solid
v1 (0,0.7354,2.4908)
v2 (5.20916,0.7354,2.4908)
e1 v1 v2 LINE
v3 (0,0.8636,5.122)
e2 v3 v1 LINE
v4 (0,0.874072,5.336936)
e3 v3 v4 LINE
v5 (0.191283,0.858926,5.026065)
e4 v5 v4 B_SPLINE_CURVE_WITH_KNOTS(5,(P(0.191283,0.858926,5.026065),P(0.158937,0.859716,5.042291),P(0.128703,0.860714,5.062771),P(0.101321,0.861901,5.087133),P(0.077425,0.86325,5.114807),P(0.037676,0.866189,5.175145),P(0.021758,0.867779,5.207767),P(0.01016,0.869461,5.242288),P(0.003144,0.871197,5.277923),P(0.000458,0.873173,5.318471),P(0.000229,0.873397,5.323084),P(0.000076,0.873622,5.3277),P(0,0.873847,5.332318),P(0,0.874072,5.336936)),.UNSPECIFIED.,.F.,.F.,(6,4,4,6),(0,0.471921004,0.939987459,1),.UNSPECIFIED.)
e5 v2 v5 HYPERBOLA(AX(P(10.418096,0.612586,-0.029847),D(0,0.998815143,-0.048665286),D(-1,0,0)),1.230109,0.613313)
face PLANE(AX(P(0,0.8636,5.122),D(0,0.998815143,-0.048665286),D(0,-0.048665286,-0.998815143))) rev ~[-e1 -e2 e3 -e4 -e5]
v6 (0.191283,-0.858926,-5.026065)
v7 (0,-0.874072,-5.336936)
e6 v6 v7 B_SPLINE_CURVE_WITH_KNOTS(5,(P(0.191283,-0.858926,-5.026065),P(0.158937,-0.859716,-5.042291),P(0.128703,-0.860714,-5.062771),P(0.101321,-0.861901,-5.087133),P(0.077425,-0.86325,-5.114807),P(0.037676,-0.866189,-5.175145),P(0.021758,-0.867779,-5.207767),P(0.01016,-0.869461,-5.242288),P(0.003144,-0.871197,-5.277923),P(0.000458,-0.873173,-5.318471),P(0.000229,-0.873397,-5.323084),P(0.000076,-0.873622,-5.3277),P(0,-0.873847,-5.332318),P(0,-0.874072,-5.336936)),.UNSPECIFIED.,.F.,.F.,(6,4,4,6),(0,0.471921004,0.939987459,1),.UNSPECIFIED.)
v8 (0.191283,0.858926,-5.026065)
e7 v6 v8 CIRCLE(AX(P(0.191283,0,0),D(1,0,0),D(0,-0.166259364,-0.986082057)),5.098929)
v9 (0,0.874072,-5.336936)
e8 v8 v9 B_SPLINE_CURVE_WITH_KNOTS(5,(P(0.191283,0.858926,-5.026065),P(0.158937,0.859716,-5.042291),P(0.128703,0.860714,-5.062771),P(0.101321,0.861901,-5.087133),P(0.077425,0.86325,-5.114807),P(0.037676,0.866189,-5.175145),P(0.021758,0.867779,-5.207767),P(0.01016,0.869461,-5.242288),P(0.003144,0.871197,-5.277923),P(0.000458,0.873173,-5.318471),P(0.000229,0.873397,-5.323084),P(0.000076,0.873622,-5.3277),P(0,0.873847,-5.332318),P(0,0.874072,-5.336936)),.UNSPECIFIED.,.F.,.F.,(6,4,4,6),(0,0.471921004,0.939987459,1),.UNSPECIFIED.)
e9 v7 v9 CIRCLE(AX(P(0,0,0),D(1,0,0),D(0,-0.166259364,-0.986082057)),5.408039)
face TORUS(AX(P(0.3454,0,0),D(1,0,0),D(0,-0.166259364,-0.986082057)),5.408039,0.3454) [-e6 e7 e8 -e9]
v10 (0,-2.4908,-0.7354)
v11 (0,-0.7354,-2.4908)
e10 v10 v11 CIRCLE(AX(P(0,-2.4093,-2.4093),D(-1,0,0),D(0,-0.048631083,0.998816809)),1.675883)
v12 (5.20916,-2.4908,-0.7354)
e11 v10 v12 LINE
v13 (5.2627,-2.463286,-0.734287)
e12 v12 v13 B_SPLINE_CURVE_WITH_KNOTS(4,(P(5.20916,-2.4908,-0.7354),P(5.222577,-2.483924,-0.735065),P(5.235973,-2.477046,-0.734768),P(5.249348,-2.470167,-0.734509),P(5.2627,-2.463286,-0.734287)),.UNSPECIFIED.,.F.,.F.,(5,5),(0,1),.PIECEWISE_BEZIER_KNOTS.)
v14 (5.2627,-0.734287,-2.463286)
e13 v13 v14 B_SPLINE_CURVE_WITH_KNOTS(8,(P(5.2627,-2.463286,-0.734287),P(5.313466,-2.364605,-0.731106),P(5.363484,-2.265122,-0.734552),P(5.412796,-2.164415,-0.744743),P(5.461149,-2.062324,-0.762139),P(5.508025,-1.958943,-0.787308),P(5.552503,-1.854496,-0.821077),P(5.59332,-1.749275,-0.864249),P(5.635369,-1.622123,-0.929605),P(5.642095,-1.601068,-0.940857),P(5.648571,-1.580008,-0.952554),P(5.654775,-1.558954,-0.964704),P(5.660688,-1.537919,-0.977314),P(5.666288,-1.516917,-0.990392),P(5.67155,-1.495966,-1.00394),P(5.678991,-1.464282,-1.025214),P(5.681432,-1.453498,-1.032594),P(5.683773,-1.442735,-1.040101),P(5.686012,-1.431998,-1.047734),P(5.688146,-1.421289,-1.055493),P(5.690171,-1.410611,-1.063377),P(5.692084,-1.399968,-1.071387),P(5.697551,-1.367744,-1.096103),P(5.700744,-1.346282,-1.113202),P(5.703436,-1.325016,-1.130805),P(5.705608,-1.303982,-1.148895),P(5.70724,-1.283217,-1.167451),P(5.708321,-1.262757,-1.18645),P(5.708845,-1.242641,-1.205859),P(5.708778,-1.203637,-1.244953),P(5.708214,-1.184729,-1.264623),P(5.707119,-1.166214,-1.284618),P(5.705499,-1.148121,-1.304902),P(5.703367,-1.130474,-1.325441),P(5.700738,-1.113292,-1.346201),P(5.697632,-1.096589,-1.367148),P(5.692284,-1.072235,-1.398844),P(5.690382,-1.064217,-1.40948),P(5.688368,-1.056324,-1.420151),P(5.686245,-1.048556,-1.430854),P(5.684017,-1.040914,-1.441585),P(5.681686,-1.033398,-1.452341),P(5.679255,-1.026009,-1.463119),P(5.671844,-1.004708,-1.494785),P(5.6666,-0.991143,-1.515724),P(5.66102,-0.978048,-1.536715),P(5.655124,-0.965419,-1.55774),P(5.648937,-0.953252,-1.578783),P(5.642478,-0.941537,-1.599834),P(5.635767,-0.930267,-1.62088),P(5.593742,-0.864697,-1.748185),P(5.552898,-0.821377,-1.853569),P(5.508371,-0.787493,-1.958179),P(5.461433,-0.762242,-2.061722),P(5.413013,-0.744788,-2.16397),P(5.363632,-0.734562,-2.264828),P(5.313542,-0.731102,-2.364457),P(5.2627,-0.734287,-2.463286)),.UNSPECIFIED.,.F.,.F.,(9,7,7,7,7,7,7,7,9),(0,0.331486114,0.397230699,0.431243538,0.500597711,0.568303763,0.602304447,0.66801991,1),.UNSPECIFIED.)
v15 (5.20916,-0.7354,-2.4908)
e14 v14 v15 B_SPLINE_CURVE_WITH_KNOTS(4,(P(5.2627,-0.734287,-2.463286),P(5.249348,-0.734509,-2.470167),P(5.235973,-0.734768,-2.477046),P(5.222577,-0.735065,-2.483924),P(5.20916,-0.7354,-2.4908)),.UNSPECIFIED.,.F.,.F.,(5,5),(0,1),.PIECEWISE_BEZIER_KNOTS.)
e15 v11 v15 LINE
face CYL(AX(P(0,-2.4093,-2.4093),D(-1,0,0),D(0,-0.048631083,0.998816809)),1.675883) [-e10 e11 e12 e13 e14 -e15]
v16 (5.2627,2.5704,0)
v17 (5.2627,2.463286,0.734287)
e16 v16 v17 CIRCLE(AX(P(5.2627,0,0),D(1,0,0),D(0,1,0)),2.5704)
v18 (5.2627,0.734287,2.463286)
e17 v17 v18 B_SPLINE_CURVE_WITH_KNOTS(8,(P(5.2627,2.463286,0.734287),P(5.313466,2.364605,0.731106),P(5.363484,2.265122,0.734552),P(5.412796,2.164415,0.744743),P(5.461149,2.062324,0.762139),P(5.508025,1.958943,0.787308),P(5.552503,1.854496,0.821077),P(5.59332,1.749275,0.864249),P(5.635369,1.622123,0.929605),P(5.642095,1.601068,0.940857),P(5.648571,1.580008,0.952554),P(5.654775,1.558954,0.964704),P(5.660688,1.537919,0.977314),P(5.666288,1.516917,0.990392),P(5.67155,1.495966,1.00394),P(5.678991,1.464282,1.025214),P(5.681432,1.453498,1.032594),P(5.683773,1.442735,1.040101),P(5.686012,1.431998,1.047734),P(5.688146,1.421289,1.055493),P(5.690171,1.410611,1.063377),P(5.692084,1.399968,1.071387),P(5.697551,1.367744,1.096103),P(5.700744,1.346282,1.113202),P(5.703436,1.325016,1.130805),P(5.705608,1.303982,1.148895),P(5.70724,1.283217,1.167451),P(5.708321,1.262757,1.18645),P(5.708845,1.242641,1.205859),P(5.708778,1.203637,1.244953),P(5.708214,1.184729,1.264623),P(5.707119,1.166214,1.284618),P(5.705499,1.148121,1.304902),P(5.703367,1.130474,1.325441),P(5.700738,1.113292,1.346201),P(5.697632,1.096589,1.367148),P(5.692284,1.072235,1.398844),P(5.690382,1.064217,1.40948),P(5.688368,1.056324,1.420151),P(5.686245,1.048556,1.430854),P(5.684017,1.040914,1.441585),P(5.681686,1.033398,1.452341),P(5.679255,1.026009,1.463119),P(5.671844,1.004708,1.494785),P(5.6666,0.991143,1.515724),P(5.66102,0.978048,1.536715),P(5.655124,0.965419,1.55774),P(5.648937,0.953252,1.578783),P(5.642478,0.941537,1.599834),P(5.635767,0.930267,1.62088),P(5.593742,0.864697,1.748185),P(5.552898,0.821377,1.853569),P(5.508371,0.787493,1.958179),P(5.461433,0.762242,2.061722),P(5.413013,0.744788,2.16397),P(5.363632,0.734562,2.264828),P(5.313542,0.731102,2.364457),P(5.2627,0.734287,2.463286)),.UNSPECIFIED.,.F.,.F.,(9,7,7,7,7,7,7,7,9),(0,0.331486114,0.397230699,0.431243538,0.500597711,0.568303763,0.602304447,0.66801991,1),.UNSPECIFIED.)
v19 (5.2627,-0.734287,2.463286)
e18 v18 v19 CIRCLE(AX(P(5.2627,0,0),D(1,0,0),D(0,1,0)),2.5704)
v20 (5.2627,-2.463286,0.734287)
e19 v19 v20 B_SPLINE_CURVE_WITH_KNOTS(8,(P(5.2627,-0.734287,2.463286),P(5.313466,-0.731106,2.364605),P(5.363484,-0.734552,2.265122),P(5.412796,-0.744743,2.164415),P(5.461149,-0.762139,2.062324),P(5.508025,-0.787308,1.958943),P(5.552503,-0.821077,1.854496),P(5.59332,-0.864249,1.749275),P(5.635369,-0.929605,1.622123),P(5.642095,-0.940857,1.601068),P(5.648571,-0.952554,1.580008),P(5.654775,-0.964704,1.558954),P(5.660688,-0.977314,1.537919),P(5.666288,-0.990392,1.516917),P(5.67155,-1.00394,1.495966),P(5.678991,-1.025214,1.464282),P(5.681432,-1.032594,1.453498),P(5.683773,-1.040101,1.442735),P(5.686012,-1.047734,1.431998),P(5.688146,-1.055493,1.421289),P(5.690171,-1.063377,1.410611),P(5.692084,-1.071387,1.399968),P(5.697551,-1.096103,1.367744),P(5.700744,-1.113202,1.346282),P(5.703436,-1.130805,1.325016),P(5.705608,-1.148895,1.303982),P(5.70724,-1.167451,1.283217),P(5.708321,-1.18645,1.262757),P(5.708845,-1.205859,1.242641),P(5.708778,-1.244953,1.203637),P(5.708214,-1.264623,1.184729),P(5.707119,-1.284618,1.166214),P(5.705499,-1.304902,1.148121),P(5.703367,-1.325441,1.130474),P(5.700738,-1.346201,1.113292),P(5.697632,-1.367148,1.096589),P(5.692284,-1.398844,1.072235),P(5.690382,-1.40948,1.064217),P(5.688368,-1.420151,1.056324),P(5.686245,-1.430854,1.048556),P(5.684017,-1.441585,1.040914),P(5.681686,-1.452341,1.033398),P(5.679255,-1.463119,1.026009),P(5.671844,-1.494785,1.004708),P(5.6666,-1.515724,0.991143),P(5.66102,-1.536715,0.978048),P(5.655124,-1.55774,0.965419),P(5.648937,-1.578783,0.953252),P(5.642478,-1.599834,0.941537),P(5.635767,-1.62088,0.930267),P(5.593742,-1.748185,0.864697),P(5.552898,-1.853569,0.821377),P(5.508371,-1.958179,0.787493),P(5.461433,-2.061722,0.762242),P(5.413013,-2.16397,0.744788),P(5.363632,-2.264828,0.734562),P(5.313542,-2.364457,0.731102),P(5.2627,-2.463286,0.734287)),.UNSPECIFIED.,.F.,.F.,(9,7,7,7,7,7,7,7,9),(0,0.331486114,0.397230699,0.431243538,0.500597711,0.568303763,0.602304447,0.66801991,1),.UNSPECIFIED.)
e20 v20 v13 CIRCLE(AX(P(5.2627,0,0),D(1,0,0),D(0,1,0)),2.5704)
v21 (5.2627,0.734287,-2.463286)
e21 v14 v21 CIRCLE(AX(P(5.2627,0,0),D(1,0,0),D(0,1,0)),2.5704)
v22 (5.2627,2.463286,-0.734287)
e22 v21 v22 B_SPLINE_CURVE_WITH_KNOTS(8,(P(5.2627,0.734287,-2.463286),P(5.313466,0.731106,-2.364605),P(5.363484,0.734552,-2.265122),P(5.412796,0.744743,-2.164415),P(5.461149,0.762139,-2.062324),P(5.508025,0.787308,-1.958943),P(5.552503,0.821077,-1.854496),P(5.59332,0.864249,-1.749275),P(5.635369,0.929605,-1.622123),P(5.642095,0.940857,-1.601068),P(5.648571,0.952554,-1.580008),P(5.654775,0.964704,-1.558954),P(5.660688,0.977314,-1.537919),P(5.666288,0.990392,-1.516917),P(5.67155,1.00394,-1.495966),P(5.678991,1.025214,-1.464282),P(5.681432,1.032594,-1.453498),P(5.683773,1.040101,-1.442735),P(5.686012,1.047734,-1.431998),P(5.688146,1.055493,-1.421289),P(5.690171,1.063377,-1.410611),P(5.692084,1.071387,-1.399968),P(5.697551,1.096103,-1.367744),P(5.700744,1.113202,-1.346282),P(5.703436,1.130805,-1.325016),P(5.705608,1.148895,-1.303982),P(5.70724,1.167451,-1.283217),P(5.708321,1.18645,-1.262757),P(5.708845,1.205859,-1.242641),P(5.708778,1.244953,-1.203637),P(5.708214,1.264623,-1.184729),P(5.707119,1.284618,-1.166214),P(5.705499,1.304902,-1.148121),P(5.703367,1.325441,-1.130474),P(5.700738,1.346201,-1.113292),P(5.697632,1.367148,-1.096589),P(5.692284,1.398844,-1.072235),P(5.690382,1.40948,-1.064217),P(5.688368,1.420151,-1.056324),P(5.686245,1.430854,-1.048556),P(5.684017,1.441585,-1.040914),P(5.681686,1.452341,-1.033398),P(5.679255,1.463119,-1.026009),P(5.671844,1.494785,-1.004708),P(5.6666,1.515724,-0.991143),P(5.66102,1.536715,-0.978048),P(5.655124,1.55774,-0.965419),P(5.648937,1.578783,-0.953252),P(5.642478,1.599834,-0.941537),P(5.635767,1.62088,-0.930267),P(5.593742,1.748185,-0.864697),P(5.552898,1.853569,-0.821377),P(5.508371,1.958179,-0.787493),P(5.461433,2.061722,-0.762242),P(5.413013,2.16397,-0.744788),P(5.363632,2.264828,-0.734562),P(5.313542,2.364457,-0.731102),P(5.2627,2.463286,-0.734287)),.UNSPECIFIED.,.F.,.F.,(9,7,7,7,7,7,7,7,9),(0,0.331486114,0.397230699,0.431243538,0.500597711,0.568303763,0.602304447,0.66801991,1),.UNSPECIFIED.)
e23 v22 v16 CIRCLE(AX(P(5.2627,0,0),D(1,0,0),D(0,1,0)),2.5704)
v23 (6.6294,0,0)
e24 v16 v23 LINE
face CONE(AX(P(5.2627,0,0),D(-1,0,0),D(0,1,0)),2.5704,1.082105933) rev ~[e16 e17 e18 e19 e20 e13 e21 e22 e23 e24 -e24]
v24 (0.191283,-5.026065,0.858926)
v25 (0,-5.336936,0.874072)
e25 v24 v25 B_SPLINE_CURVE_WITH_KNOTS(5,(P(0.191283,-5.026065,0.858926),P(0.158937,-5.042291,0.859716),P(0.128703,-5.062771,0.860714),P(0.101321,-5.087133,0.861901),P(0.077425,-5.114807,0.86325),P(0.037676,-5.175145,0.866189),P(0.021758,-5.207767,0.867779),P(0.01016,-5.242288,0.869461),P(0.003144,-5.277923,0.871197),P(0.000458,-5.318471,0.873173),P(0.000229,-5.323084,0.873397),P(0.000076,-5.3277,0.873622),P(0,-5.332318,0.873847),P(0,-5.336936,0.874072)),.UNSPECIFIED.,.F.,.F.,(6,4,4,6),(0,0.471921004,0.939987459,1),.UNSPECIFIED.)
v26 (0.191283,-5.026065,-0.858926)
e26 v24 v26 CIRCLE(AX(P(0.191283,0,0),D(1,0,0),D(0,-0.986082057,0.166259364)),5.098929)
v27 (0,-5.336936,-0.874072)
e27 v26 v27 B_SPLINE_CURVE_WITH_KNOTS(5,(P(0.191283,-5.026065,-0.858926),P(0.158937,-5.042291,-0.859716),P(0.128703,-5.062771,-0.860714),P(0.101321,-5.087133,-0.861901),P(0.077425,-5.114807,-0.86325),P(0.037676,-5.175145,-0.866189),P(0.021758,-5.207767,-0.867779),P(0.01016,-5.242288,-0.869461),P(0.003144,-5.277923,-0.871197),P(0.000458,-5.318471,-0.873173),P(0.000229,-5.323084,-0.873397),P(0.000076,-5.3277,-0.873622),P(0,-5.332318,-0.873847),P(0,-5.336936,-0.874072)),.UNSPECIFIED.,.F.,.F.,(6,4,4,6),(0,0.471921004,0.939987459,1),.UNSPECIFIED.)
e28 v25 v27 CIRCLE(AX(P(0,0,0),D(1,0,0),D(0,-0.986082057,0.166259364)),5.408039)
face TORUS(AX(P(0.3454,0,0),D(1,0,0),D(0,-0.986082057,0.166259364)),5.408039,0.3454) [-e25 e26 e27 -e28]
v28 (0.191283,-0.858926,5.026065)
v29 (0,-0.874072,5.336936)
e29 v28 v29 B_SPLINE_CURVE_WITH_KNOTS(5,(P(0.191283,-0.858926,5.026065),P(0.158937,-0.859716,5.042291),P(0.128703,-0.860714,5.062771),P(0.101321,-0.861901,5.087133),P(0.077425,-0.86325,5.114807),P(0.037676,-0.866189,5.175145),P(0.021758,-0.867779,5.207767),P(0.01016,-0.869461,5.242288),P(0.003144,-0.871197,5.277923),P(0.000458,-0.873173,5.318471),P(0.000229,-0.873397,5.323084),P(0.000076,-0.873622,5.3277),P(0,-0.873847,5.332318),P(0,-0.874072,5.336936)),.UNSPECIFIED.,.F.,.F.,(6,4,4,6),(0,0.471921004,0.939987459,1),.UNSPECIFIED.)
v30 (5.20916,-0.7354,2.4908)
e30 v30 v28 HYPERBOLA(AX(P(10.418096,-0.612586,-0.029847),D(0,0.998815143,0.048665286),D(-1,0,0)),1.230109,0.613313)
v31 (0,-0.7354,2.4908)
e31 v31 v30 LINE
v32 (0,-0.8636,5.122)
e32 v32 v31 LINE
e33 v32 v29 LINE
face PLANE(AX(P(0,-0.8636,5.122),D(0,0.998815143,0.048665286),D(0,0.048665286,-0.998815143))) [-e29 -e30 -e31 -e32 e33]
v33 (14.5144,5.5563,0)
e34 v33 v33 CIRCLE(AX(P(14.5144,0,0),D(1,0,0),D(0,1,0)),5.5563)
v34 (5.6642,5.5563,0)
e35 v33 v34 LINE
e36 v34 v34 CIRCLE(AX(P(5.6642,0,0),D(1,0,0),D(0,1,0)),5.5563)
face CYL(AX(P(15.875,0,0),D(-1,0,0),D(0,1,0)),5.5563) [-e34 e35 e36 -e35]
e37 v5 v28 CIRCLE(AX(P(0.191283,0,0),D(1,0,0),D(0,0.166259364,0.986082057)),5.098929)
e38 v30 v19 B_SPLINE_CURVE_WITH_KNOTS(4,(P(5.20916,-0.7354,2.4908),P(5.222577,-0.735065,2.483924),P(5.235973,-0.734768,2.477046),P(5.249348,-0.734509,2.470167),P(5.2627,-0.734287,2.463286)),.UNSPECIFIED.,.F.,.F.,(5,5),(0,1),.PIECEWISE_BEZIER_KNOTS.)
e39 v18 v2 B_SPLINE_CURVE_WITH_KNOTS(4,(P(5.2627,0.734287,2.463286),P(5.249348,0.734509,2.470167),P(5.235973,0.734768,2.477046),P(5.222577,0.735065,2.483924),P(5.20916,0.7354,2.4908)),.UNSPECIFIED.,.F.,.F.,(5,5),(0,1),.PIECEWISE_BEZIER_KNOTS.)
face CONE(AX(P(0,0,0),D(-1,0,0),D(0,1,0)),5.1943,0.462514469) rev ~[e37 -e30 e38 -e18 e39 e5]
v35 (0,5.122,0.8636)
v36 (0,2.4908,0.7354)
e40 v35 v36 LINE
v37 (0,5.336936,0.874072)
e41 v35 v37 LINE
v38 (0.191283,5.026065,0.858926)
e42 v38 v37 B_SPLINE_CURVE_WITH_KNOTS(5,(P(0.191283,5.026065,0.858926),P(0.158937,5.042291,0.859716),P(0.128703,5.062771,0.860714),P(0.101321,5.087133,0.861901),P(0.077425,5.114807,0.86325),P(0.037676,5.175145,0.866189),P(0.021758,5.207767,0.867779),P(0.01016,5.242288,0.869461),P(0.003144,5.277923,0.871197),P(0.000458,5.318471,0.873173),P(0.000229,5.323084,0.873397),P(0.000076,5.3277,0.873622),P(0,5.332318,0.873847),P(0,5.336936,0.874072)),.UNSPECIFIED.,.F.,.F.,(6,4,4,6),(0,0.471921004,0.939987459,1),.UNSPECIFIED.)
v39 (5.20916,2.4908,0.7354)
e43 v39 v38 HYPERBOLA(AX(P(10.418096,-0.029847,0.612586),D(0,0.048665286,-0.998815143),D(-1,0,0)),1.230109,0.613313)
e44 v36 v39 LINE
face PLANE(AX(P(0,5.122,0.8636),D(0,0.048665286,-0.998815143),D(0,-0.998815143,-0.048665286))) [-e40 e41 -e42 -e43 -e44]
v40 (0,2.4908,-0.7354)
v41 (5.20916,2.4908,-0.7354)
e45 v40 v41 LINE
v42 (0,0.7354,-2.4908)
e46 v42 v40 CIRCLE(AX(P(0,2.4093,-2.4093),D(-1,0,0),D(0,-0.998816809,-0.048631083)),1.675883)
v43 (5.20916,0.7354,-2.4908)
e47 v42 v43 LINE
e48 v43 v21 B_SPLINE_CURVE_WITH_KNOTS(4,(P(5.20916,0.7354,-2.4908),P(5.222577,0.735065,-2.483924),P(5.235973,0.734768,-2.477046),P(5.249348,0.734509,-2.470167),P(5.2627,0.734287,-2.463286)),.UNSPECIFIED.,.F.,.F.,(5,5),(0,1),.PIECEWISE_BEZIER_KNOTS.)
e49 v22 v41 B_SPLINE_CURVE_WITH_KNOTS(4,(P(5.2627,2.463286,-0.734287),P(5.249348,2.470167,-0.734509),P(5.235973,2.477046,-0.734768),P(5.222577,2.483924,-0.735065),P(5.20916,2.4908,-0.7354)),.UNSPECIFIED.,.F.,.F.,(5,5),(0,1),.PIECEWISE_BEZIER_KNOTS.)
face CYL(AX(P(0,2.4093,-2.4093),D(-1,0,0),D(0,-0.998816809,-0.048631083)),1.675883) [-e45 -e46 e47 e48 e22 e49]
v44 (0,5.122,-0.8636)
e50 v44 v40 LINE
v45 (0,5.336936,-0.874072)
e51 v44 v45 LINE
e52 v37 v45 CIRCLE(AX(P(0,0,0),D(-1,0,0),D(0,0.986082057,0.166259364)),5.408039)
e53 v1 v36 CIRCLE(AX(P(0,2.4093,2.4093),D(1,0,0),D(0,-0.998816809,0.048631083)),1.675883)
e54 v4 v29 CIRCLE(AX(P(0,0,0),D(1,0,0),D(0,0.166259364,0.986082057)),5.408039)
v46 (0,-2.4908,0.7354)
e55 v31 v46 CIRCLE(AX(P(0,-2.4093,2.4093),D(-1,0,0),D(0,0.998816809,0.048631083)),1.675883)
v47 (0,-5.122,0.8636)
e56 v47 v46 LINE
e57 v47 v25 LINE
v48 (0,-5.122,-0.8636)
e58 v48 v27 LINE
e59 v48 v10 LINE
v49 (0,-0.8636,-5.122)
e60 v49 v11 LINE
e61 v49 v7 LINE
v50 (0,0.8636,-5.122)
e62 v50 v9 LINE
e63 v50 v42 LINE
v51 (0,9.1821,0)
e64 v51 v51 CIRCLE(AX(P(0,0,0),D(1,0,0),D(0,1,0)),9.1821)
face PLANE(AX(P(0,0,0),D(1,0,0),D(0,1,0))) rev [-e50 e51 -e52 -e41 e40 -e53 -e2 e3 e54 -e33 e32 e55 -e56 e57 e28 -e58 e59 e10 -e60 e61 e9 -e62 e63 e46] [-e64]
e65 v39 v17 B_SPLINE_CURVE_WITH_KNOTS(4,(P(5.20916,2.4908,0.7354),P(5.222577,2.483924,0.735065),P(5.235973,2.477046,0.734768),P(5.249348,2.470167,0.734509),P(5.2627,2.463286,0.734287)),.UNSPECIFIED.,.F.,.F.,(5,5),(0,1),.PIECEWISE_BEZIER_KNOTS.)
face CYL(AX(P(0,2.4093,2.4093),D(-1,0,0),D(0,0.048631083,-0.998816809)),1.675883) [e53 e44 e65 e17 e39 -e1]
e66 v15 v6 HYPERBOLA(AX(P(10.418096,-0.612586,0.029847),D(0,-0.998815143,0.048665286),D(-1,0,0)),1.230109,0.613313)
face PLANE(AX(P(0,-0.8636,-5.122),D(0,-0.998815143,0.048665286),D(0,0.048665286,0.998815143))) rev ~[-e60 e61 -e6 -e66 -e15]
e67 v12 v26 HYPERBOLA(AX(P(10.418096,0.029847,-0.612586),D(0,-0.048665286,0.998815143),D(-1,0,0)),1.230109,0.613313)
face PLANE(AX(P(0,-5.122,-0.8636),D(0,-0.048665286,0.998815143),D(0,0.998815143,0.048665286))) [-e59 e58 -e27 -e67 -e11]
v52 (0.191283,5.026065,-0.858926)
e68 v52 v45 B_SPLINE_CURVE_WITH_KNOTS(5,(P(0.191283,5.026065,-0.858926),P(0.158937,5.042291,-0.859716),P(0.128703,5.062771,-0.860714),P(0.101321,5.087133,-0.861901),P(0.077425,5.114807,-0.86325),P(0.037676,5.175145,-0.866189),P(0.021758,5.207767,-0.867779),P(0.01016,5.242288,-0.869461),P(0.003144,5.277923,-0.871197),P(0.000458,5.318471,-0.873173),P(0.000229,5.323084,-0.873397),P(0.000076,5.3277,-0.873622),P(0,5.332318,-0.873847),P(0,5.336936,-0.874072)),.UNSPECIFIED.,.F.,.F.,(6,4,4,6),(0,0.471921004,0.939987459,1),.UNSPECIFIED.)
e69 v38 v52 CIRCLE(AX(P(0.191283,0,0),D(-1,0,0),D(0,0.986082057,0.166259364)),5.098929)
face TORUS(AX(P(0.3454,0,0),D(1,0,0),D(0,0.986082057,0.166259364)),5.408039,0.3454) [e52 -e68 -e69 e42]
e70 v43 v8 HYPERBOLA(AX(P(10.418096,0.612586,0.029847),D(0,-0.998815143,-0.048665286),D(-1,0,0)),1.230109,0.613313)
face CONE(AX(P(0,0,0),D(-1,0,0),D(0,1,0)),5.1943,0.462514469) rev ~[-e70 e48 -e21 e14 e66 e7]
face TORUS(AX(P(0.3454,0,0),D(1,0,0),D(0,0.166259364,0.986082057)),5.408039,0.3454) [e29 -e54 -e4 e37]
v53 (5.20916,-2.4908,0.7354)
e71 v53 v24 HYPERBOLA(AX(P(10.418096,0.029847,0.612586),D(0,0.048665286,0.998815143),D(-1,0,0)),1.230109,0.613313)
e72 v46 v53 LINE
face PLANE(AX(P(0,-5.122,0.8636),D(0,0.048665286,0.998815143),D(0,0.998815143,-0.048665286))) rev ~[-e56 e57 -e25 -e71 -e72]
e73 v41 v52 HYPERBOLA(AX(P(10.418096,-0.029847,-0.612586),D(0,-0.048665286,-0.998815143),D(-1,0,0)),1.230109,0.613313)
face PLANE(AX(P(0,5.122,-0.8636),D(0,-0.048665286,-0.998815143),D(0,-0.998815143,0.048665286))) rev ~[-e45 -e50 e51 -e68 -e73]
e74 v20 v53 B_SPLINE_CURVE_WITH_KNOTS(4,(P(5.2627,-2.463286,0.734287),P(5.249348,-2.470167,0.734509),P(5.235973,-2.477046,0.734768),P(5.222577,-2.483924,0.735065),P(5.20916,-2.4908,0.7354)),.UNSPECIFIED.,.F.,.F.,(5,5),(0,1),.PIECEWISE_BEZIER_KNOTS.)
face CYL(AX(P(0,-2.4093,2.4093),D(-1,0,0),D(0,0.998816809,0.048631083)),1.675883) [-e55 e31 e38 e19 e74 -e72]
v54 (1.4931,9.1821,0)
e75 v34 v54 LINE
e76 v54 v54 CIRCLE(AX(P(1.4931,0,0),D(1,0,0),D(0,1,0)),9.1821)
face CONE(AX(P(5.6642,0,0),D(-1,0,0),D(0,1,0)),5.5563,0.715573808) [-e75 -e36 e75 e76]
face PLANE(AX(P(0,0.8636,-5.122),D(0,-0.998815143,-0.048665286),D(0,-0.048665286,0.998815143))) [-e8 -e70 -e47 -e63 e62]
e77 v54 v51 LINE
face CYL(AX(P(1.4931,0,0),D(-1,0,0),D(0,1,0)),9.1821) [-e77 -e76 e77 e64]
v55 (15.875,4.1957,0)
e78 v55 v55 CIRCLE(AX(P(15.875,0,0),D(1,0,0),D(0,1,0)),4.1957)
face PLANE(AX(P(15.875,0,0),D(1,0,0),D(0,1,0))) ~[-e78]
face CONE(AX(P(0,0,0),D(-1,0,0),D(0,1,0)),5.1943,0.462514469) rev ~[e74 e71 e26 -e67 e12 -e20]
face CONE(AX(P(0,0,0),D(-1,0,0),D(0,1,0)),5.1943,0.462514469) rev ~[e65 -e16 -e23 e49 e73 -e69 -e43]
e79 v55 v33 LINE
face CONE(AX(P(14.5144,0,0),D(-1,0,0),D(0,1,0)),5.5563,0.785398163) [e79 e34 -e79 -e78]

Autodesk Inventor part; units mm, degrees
ref_plane "YZ Plane" through (0, 0, 0) normal (1, 0, 0) x (0, 1, 0)
ref_plane "XZ Plane" through (0, 0, 0) normal (0, 1, 0) x (-1, 0, 0)
sketch "Sketch1" plane through (0, 0, 0) normal (0, 0, 1) x (1, 0, 0)
  line L0 (6.6294, 0) -> (15.875, 0)
  line L1 (15.875, 0) -> (15.875, 5.5563)
  line L2 (15.875, 5.5563) -> (5.6642, 5.5563)
  line L3 (1.4931, 9.1821) -> (0, 9.1821)
  line L4 (-3.175, 0) -> (19.05, 0) projected
  line L5 (0, -1.8364) -> (0, 11.0185) projected
  line L6 (0, 5.1943) -> (5.2627, 2.5704)
  line L7 (5.2627, 2.5704) -> (6.6294, 0)
  line L8 (5.6642, 5.5563) -> (1.4931, 9.1821)
  line L9 (0, 9.1821) -> (0, 5.1943)
  dimension "d2" = 11.1125
  dimension "d3" = 18.3642
  dimension "d4" = 6.6294
  dimension "d5" = 10.3886
  dimension "d6" = 26.5
  dimension "d7" = 62
  dimension "d13" = 41
  dimension "d14" = 5.6642
  dimension "d15" = 15.875
revolve "Body" add sketch "Sketch1" angle 360 about axis through (6.6294, 0, 0) along (1, 0, 0) contours L7 L6 L5 L3 L8 L2 L1 L0
sketch "Sketch2" plane through (0, 0, 0) normal (-1, 0, 0) x (0, 0, 1)
  line L0 (0, -12.8549) -> (0, 12.8549) projected
  line L1 (-12.8549, 0) -> (12.8549, 0) projected
  line L2 (0, 5.1943) -> (0, 0) construction
  line L3 (0, 0) -> (5.1943, 0) construction
  arc A0 (1.7314, 0) -> (0, 1.7314) centre (0, 0) ccw
  line L4 (0, 0) -> (0.7947, 0.7947) construction
  arc A1 (2.5971, 0) -> (0, 2.5971) centre (0, 0) ccw construction
  line L5 (0.8636, 5.122) -> (0.7354, 2.4908)
  line L6 (5.122, 0.8636) -> (2.4908, 0.7354)
  arc A2 (0.7354, 2.4908) -> (2.4908, 0.7354) centre (2.4093, 2.4093) ccw
  arc A3 (5.1943, 0) -> (5.122, 0.8636) centre (0, 0) ccw
  arc A4 (0.8636, 5.122) -> (0, 5.1943) centre (0, 0) ccw
  arc A5 (5.122, 0.8636) -> (0.8636, 5.122) centre (0, 0) ccw
  line L7 (0.8636, -5.122) -> (0.7354, -2.4908)
  line L8 (5.122, -0.8636) -> (2.4908, -0.7354)
  arc A6 (2.4908, -0.7354) -> (0.7354, -2.4908) centre (2.4093, -2.4093) ccw
  arc A7 (5.122, -0.8636) -> (5.1943, 0) centre (0, 0) ccw
  arc A8 (0, -5.1943) -> (0.8636, -5.122) centre (0, 0) ccw
  arc A9 (0.8636, -5.122) -> (5.122, -0.8636) centre (0, 0) ccw
  line L9 (-0.8636, 5.122) -> (-0.7354, 2.4908)
  line L10 (-5.122, 0.8636) -> (-2.4908, 0.7354)
  arc A10 (-2.4908, 0.7354) -> (-0.7354, 2.4908) centre (-2.4093, 2.4093) ccw
  arc A11 (-5.122, 0.8636) -> (-5.1943, 0) centre (0, 0) ccw
  arc A12 (0, 5.1943) -> (-0.8636, 5.122) centre (0, 0) ccw
  arc A13 (-0.8636, 5.122) -> (-5.122, 0.8636) centre (0, 0) ccw
  arc A14 (-5.122, -0.8636) -> (-0.8636, -5.122) centre (0, 0) ccw
  arc A15 (-0.8636, -5.122) -> (0, -5.1943) centre (0, 0) ccw
  arc A16 (-5.1943, 0) -> (-5.122, -0.8636) centre (0, 0) ccw
  line L11 (-5.122, -0.8636) -> (-2.4908, -0.7354)
  arc A17 (-0.7354, -2.4908) -> (-2.4908, -0.7354) centre (-2.4093, -2.4093) ccw
  line L12 (-0.8636, -5.122) -> (-0.7354, -2.4908)
  dimension "d18" = 45
  dimension "d19" = 3.4629
  dimension "d20" = 5.1943
  dimension "d21" = 10.3886
  dimension "d22" = 0.8636
extrude "Slot" add sketch "Sketch2" against normal up to next contours A2 L5 A5 L6 | L9 A10 L10 A13 | L7 A6 L8 A9 | A14 L11 A17 L12
fillet "Fillet1" radius 0.3454 4 edges at (0, 5.1943, 0) (0, 0, 5.1943) (0, -5.1943, 0) (0, 0, -5.1943)
thread "Thread" size "7/16-14 UNC" class "2A" standard "ANSI Unified Screw Threads" length 5.6756
chamfer "Chamfer1" distance 1.3606 distance2 1.3606 1 edges at (15.875, -5.5563, 0) measured on face at (15.875, 2.9153, 1.1751)
ref_plane "Work Plane2" through (2.032, 0, 0) normal (0, 1, 0) x (1, 0, 0)
equation "\"d2\" = GD"
equation "\"d3\" = KOD"
equation "\"d4\" = INTI"
equation "\"d5\" = SDM"
equation "\"d13\" = 0.5 * SEWI"
equation "\"d14\" = KOH"
equation "\"d15\" = NLG"
equation "\"d19\" = 0.333333 * SDM"
equation "\"d20\" = 0.5 * SDM"
equation "\"d21\" = SDM"
equation "\"d22\" = 0.5 * SBR"
equation "\"d45\" = INTI"
equation "\"d25\" = 0.2 * SBR"
equation "\"d9\" = GEL"
equation "\"d11\" = -0.5 * SPD + 0.5 * GD"
equation "\"d12\" = GUL"
equation "\"GD\" = NND"
equation "\"NLG\" = 15.875"
equation "\"GEL\" = 5.67563"
equation "\"KOD\" = 18.3642"
equation "\"KOH\" = 5.6642"
equation "\"SDM\" = 10.3886"
equation "\"INTI\" = 6.6294"
equation "\"SBR\" = 1.7272"
equation "\"GUL\" = 0.75 * GAL"
equation "\"SPD\" = 8.3914"
equation "\"SEWI\" = 82deg"
equation "\"d0\" = NLG"
equation "\"d1\" = KOH"
equation "\"d17\" = SDM"
equation "\"TOA\" = 30deg"
equation "\"THREADDIA\" = 11.1125"
equation "\"BDM\" = NND"
equation "\"NND\" = 11.1125"
equation "\"GAL\" = 1.81407"
equation "\"GD1\" = SPD"
properties part number "ANSI B18.6.3 - 7/16-14 x 5/8, CRFCHMSTII(5)" material "Steel, Mild"
